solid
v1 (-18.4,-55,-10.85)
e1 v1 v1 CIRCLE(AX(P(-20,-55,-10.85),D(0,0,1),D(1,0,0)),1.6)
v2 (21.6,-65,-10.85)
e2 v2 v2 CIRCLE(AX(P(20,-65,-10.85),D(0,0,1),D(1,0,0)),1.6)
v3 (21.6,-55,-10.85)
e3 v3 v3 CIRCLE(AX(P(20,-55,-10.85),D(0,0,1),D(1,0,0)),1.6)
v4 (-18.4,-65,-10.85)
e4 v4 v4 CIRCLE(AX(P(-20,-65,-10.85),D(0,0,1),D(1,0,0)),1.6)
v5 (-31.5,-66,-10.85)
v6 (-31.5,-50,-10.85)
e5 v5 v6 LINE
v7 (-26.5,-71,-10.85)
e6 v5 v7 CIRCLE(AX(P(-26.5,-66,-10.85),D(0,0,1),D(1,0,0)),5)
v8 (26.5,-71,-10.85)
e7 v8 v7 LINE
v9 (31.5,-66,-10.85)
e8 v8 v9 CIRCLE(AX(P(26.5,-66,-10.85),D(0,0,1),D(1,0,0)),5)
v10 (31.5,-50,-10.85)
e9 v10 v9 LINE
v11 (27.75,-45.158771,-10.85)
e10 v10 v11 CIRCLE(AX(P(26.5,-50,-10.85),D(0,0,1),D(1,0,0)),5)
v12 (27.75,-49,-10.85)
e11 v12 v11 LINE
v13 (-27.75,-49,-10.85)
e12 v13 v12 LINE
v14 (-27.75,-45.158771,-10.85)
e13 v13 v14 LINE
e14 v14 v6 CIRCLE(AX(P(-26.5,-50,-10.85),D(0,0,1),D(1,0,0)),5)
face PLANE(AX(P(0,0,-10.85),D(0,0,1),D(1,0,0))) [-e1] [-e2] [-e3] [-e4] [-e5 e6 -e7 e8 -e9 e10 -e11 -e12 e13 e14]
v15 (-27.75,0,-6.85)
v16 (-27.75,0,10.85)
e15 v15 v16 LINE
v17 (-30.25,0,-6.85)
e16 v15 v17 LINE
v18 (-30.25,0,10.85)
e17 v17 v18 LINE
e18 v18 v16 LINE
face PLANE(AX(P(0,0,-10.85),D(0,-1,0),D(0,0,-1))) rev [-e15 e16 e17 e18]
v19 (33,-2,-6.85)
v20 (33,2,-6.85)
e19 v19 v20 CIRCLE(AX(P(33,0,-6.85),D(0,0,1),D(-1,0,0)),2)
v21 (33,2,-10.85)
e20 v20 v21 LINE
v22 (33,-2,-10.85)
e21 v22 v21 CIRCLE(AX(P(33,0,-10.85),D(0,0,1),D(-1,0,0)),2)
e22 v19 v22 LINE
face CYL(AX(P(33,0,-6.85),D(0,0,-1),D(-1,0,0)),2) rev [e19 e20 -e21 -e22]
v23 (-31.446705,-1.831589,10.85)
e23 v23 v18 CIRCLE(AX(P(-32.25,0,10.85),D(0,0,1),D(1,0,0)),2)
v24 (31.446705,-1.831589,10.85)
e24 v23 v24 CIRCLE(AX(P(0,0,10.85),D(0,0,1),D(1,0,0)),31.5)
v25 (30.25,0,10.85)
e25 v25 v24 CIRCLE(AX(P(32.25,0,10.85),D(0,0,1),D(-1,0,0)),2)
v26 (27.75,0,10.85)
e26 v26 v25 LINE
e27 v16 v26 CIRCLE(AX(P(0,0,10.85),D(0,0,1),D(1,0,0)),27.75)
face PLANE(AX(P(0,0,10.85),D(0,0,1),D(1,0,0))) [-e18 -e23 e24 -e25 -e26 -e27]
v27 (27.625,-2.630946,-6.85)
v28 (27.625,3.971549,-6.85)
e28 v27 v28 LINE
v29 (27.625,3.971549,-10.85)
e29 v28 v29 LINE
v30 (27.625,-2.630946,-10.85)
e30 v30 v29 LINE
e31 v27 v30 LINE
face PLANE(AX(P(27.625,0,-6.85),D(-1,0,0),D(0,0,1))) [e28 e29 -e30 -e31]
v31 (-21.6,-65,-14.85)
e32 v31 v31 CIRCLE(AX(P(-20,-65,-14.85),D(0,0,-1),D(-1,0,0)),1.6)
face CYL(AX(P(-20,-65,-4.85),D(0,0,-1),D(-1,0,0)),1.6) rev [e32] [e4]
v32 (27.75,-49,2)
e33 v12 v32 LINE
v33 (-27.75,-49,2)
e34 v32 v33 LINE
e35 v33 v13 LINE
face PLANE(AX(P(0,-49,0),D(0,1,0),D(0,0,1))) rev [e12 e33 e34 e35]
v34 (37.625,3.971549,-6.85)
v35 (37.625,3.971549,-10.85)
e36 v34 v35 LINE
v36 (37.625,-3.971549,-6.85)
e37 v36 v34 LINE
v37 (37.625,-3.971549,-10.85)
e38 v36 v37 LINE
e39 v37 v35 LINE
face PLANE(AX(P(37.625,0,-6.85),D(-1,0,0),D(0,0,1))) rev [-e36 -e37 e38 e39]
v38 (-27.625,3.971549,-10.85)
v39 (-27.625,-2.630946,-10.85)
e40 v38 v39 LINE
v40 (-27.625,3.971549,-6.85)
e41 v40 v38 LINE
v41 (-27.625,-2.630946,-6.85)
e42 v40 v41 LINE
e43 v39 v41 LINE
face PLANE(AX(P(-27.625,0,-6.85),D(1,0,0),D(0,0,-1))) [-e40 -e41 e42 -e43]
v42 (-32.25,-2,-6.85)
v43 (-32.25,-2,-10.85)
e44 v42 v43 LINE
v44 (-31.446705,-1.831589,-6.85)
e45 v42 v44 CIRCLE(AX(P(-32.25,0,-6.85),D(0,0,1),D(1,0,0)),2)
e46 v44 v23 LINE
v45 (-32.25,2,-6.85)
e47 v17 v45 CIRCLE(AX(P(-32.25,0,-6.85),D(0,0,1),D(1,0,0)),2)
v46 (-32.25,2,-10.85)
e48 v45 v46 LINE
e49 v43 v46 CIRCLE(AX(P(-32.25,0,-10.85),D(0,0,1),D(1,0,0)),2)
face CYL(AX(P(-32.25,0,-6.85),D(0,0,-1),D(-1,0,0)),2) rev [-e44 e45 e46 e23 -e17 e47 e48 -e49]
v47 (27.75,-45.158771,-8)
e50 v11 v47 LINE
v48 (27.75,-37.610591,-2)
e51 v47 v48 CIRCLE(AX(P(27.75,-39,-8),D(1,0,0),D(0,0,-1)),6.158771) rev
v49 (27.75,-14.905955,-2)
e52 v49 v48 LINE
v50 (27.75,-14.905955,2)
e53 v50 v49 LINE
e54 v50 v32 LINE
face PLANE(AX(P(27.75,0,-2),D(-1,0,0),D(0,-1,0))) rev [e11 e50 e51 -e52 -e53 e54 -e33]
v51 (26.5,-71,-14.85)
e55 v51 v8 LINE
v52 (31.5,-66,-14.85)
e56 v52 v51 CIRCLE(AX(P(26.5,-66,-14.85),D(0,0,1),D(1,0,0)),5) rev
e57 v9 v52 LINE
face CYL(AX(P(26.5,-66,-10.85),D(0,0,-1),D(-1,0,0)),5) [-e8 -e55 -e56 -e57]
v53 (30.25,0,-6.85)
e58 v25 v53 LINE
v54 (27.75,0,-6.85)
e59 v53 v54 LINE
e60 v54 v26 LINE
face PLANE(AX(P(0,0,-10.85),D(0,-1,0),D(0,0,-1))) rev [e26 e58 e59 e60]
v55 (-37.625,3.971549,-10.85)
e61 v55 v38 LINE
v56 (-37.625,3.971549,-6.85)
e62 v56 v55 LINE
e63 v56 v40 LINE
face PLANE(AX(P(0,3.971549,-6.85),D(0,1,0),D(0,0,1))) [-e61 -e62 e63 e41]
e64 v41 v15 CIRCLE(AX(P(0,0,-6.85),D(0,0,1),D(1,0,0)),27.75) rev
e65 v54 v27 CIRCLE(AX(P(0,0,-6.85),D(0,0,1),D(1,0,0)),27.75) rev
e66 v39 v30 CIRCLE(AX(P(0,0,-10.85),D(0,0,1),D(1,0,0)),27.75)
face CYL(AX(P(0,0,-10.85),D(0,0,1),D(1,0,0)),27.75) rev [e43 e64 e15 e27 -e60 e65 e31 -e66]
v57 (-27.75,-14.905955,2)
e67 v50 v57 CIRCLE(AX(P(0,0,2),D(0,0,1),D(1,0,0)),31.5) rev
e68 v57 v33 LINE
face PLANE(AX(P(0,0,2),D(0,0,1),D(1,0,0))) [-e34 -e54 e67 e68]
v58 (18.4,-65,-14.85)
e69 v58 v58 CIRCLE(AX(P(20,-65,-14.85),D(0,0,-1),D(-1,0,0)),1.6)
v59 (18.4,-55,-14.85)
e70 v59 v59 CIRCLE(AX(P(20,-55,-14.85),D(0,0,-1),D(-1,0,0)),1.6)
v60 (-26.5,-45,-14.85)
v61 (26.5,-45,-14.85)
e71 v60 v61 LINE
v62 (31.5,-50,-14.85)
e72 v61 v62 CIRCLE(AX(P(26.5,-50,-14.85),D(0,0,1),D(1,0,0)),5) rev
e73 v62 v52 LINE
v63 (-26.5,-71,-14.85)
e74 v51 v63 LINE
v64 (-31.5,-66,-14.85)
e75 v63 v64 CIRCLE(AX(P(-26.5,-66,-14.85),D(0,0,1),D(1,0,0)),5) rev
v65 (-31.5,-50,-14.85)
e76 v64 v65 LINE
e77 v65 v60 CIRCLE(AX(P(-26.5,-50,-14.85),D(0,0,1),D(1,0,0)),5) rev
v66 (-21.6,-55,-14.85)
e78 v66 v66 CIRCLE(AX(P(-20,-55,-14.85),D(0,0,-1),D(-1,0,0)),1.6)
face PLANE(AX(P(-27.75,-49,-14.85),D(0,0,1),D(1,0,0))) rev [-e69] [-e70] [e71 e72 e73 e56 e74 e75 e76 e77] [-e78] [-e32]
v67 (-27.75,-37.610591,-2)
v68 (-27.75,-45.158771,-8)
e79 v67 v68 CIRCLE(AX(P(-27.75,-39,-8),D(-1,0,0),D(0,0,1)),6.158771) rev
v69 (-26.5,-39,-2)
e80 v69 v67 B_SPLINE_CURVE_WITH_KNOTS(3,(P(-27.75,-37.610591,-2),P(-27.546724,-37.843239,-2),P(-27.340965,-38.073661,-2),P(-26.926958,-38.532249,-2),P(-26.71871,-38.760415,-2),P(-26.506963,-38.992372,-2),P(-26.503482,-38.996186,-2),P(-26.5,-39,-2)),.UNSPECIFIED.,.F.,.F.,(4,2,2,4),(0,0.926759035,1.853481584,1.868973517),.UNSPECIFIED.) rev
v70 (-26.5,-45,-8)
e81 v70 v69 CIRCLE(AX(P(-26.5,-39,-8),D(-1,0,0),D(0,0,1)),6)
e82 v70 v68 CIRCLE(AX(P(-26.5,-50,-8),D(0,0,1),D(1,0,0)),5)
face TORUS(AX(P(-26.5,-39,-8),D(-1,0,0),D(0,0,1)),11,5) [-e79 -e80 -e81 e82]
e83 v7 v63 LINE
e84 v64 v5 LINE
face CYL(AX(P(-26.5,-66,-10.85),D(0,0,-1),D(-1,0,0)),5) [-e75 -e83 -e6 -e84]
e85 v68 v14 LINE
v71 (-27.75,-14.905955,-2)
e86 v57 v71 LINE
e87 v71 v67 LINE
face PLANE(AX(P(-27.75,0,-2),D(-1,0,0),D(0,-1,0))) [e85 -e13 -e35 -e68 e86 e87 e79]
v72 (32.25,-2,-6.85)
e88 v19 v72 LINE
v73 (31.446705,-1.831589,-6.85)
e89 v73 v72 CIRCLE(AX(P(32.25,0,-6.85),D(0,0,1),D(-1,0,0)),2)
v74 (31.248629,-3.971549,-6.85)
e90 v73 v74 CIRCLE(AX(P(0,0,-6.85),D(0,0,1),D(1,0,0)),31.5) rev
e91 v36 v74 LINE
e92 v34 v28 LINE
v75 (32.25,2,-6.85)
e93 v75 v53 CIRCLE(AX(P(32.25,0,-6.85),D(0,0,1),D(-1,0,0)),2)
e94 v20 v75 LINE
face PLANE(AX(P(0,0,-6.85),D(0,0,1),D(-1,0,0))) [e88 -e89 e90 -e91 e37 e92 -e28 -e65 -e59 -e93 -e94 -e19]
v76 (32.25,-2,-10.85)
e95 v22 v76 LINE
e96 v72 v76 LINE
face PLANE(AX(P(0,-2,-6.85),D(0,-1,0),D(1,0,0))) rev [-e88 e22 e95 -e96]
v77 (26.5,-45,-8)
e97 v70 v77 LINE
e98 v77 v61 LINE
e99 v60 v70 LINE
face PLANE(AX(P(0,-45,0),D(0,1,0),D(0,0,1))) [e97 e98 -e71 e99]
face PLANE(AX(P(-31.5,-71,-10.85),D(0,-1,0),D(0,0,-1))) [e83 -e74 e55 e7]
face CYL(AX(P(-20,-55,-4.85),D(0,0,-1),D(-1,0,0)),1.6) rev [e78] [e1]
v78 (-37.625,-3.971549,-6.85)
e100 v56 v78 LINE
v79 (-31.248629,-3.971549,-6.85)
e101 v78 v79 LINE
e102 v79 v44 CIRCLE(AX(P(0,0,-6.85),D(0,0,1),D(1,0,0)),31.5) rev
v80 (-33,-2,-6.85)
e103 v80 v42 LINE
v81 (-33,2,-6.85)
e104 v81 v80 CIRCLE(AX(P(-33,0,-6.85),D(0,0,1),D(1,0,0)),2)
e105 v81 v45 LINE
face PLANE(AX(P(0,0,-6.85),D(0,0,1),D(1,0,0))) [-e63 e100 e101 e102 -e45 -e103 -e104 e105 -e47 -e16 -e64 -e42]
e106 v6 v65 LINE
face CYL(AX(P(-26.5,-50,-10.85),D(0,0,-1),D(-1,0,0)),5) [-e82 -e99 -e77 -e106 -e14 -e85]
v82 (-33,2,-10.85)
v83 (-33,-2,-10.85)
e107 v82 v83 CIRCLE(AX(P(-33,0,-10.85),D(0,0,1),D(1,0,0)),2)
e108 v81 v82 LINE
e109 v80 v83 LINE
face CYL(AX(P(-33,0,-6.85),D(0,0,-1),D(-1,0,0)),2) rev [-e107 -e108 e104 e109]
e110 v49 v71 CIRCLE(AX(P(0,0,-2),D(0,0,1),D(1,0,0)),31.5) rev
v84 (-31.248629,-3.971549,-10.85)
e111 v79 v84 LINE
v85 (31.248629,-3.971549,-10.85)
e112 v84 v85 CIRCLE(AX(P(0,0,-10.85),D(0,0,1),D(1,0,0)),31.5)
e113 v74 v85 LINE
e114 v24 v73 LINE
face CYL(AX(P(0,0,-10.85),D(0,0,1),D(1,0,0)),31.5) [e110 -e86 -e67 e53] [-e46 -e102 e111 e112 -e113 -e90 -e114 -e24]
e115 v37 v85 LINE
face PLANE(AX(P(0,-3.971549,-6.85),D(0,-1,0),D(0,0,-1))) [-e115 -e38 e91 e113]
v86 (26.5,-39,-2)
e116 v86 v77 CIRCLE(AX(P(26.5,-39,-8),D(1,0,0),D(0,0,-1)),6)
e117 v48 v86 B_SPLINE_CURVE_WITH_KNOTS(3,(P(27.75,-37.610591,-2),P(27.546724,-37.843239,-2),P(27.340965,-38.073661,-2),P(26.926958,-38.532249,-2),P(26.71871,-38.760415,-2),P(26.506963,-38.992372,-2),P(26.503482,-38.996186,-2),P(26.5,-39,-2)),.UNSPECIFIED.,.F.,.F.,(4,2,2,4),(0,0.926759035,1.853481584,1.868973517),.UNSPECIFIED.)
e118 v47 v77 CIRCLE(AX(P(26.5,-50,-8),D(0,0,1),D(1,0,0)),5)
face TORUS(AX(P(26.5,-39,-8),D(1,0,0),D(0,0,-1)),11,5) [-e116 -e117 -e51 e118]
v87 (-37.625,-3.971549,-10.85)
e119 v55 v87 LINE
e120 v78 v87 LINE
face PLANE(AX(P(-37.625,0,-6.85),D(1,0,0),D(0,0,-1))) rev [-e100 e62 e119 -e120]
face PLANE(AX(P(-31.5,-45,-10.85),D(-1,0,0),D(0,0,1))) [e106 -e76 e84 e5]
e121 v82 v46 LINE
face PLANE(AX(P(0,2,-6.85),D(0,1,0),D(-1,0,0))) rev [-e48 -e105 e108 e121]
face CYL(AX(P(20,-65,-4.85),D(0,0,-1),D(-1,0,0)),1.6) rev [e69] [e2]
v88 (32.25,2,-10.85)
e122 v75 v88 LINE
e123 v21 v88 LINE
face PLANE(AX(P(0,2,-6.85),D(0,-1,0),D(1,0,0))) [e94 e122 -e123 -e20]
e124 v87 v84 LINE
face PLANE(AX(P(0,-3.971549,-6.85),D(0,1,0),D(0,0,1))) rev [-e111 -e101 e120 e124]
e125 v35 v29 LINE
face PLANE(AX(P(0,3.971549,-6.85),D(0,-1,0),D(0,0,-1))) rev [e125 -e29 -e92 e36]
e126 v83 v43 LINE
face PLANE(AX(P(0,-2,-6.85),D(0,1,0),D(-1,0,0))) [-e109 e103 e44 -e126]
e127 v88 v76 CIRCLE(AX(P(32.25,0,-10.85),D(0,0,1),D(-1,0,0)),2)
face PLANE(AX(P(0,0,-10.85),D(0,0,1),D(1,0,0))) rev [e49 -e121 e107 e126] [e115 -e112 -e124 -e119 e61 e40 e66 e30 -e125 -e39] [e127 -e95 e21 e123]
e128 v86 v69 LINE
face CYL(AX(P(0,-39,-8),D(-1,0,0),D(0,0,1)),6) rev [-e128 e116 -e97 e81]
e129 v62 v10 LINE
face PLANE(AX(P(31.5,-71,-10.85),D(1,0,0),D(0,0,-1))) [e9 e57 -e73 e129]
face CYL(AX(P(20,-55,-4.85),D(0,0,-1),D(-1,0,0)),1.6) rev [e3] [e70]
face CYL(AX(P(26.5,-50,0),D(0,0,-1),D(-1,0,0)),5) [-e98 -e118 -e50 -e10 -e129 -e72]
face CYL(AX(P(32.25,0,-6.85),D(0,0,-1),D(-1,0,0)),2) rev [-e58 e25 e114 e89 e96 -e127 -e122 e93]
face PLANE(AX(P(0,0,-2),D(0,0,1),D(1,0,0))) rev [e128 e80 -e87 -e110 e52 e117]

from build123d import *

# Parameters (mm, degrees)
BOSS_EXTRU_1_DEPTH           = 10.85
BOSS_EXTRU_1_DEPTH_BACK      = 10.85
BOSS_EXTRU_2_START           = -10.85
ESQUISSE2_W                  = 10
ESQUISSE2_H                  = 7.943097622
BOSS_EXTRU_2_DEPTH           = 4
ESQUISSE3_R                  = 2
ENL_V_MAT_EXTRU_1_DEPTH      = 51.255478557
R_P_TITION_CIRCULAIRE1_COUNT = 2
BOSS_EXTRU_3_DEPTH           = 2
BOSS_EXTRU_3_DEPTH_BACK      = 2
ESQUISSE5_W                  = 55.5
ESQUISSE5_H                  = 16.85
BOSS_EXTRU_4_DEPTH           = 4
CONG_1_R                     = 6
ESQUISSE6_W                  = 63
ESQUISSE6_H                  = 26
BOSS_EXTRU_5_DEPTH           = 4
ESQUISSE7_R                  = 1.6
ENL_V_MAT_EXTRU_2_DEPTH      = 10
CONG_2_START                 = -16
CONG_2_DEPTH                 = 7.9999999


with BuildPart() as part:
    # Esquisse1 → Boss.-Extru.1 (new, two sides: drawn at the far end of the back side and taken through both)
    with BuildSketch(Plane.XY.offset(-BOSS_EXTRU_1_DEPTH_BACK)):
        with BuildLine():
            Line((31.5, 0), (27.75, 0))
            ThreePointArc((27.75, 0), (0, -27.75), (-27.75, 0))
            Line((-27.75, 0), (-31.5, 0))
            ThreePointArc((-31.5, 0), (0, -31.5), (31.5, 0))
        make_face()
    extrude(amount=BOSS_EXTRU_1_DEPTH + BOSS_EXTRU_1_DEPTH_BACK)

    # Esquisse2 → Boss.-Extru.2 (add)
    with BuildSketch(Plane.XY.offset(BOSS_EXTRU_2_START)):
        with Locations((-32.625, 0)):
            Rectangle(ESQUISSE2_W, ESQUISSE2_H)
        with BuildLine():
            ThreePointArc((-33, -2), (-35, 0), (-33, 2))
            Line((-33, 2), (-32.25, 2))
            ThreePointArc((-32.25, 2), (-30.835786438, 1.414213562), (-30.25, 0))
            ThreePointArc((-30.25, 0), (-30.835786438, -1.414213562), (-32.25, -2))
            Line((-32.25, -2), (-33, -2))
        make_face(mode=Mode.SUBTRACT)
    boss_extru_2 = extrude(amount=BOSS_EXTRU_2_DEPTH)

    # Esquisse3 → Enlèv. mat.-Extru.1 (cut, symmetric)
    with BuildSketch(Plane.XY):
        with Locations((-32.25, 0)):
            Circle(ESQUISSE3_R)
    enl_v_mat_extru_1 = extrude(amount=ENL_V_MAT_EXTRU_1_DEPTH, both=True, mode=Mode.SUBTRACT)

    # Répétition circulaire1: Boss.-Extru.2, Enlèv. mat.-Extru.1 ×2 about axis
    r_p_tition_circulaire1_axis = Axis((0, 0, 0), (0, 0, 1))
    add([boss_extru_2.rotate(r_p_tition_circulaire1_axis, i * 360 / R_P_TITION_CIRCULAIRE1_COUNT) for i in range(1, R_P_TITION_CIRCULAIRE1_COUNT)])
    add([enl_v_mat_extru_1.rotate(r_p_tition_circulaire1_axis, i * 360 / R_P_TITION_CIRCULAIRE1_COUNT) for i in range(1, R_P_TITION_CIRCULAIRE1_COUNT)], mode=Mode.SUBTRACT)

    # Esquisse4 → Boss.-Extru.3 (add, two sides: drawn at the far end of the back side and taken through both)
    with BuildSketch(Plane.XY.offset(-BOSS_EXTRU_3_DEPTH_BACK)):
        with BuildLine():
            Line((27.75, -45), (27.75, -3.971548811))
            Line((27.75, -3.971548811), (27.464327773, -3.971548811))
            ThreePointArc((27.464327773, -3.971548811), (0, -27.75), (-27.464327773, -3.971548811))
            Line((-27.464327773, -3.971548811), (-27.75, -3.971548811))
            Line((-27.75, -3.971548811), (-27.75, -45))
            Line((-27.75, -45), (27.75, -45))
        make_face()
    extrude(amount=BOSS_EXTRU_3_DEPTH + BOSS_EXTRU_3_DEPTH_BACK)

    # Esquisse5 → Boss.-Extru.4 (add)
    with BuildSketch(Plane.XZ.offset(45)):
        with Locations((0, -6.425)):
            Rectangle(ESQUISSE5_W, ESQUISSE5_H)
    extrude(amount=BOSS_EXTRU_4_DEPTH)

    # Congé1
    cong_1_edges = [part.edges().sort_by_distance(p)[0] for p in [
        (0, -45, -2),
    ]]
    fillet(cong_1_edges, radius=CONG_1_R)

    # Esquisse6 → Boss.-Extru.5 (add)
    with BuildSketch(Plane(origin=(0, 0, -14.85), x_dir=(-1, 0, 0), z_dir=(0, 0, -1))):
        with Locations((0, -58)):
            Rectangle(ESQUISSE6_W, ESQUISSE6_H)
    extrude(amount=-BOSS_EXTRU_5_DEPTH)

    # Esquisse7 → Enlèv. mat.-Extru.2 (cut)
    with BuildSketch(Plane(origin=(0, 0, -14.85), x_dir=(-1, 0, 0), z_dir=(0, 0, -1))):
        with Locations((-20, -55)):
            Circle(ESQUISSE7_R)
        with Locations((20, -55)):
            Circle(ESQUISSE7_R)
        with Locations((-20, -65)):
            Circle(ESQUISSE7_R)
        with Locations((20, -65)):
            Circle(ESQUISSE7_R)
    extrude(amount=-ENL_V_MAT_EXTRU_2_DEPTH, mode=Mode.SUBTRACT)

    # Congé2: read off the stored shape, not the designer's step
    # Congé2 outline → Congé2 (cut)
    with BuildSketch(Plane.XY.offset(CONG_2_START)):
        with BuildLine():
            Line((-31.5, -71), (-26.5, -71))
            ThreePointArc((-26.5, -71), (-30.035533906, -69.535533906), (-31.5, -66))
            Line((-31.5, -66), (-31.5, -71))
        make_face()
        with BuildLine():
            ThreePointArc((31.5, -66), (30.035533906, -69.535533906), (26.5, -71))
            Line((26.5, -71), (31.5, -71))
            Line((31.5, -71), (31.5, -66))
        make_face()
        with BuildLine():
            Line((-31.5, -45), (-31.5, -50))
            ThreePointArc((-31.5, -50), (-30.035533906, -46.464466094), (-26.5, -45))
            Line((-26.5, -45), (-31.5, -45))
        make_face()
        with BuildLine():
            Line((31.5, -50), (31.5, -45))
            Line((31.5, -45), (26.5, -45))
            ThreePointArc((26.5, -45), (30.035533906, -46.464466094), (31.5, -50))
        make_face()
    extrude(amount=CONG_2_DEPTH, mode=Mode.SUBTRACT)

    # Cong_2 2 outline → Cong_2 2 (revolve, cut)
    with BuildSketch(Plane(origin=(0, -39, -8), x_dir=(0, 1, 0), z_dir=(0, 0, -1))):
        with BuildLine():
            Line((6, -27.75), (6.158770817, -27.75))
            ThreePointArc((6.158770817, -27.75), (6.039851519, -27.130021462), (6, -26.5))
            Line((6, -26.5), (6, -27.75))
        make_face()
        with BuildLine():
            Line((6, 27.75), (6, 26.5))
            ThreePointArc((6, 26.5), (6.039851519, 27.130021462), (6.158770817, 27.75))
            Line((6.158770817, 27.75), (6, 27.75))
        make_face()
    revolve(axis=Axis((0, -39, -8), (1, 0, 0)), mode=Mode.SUBTRACT)


solid = part.part
